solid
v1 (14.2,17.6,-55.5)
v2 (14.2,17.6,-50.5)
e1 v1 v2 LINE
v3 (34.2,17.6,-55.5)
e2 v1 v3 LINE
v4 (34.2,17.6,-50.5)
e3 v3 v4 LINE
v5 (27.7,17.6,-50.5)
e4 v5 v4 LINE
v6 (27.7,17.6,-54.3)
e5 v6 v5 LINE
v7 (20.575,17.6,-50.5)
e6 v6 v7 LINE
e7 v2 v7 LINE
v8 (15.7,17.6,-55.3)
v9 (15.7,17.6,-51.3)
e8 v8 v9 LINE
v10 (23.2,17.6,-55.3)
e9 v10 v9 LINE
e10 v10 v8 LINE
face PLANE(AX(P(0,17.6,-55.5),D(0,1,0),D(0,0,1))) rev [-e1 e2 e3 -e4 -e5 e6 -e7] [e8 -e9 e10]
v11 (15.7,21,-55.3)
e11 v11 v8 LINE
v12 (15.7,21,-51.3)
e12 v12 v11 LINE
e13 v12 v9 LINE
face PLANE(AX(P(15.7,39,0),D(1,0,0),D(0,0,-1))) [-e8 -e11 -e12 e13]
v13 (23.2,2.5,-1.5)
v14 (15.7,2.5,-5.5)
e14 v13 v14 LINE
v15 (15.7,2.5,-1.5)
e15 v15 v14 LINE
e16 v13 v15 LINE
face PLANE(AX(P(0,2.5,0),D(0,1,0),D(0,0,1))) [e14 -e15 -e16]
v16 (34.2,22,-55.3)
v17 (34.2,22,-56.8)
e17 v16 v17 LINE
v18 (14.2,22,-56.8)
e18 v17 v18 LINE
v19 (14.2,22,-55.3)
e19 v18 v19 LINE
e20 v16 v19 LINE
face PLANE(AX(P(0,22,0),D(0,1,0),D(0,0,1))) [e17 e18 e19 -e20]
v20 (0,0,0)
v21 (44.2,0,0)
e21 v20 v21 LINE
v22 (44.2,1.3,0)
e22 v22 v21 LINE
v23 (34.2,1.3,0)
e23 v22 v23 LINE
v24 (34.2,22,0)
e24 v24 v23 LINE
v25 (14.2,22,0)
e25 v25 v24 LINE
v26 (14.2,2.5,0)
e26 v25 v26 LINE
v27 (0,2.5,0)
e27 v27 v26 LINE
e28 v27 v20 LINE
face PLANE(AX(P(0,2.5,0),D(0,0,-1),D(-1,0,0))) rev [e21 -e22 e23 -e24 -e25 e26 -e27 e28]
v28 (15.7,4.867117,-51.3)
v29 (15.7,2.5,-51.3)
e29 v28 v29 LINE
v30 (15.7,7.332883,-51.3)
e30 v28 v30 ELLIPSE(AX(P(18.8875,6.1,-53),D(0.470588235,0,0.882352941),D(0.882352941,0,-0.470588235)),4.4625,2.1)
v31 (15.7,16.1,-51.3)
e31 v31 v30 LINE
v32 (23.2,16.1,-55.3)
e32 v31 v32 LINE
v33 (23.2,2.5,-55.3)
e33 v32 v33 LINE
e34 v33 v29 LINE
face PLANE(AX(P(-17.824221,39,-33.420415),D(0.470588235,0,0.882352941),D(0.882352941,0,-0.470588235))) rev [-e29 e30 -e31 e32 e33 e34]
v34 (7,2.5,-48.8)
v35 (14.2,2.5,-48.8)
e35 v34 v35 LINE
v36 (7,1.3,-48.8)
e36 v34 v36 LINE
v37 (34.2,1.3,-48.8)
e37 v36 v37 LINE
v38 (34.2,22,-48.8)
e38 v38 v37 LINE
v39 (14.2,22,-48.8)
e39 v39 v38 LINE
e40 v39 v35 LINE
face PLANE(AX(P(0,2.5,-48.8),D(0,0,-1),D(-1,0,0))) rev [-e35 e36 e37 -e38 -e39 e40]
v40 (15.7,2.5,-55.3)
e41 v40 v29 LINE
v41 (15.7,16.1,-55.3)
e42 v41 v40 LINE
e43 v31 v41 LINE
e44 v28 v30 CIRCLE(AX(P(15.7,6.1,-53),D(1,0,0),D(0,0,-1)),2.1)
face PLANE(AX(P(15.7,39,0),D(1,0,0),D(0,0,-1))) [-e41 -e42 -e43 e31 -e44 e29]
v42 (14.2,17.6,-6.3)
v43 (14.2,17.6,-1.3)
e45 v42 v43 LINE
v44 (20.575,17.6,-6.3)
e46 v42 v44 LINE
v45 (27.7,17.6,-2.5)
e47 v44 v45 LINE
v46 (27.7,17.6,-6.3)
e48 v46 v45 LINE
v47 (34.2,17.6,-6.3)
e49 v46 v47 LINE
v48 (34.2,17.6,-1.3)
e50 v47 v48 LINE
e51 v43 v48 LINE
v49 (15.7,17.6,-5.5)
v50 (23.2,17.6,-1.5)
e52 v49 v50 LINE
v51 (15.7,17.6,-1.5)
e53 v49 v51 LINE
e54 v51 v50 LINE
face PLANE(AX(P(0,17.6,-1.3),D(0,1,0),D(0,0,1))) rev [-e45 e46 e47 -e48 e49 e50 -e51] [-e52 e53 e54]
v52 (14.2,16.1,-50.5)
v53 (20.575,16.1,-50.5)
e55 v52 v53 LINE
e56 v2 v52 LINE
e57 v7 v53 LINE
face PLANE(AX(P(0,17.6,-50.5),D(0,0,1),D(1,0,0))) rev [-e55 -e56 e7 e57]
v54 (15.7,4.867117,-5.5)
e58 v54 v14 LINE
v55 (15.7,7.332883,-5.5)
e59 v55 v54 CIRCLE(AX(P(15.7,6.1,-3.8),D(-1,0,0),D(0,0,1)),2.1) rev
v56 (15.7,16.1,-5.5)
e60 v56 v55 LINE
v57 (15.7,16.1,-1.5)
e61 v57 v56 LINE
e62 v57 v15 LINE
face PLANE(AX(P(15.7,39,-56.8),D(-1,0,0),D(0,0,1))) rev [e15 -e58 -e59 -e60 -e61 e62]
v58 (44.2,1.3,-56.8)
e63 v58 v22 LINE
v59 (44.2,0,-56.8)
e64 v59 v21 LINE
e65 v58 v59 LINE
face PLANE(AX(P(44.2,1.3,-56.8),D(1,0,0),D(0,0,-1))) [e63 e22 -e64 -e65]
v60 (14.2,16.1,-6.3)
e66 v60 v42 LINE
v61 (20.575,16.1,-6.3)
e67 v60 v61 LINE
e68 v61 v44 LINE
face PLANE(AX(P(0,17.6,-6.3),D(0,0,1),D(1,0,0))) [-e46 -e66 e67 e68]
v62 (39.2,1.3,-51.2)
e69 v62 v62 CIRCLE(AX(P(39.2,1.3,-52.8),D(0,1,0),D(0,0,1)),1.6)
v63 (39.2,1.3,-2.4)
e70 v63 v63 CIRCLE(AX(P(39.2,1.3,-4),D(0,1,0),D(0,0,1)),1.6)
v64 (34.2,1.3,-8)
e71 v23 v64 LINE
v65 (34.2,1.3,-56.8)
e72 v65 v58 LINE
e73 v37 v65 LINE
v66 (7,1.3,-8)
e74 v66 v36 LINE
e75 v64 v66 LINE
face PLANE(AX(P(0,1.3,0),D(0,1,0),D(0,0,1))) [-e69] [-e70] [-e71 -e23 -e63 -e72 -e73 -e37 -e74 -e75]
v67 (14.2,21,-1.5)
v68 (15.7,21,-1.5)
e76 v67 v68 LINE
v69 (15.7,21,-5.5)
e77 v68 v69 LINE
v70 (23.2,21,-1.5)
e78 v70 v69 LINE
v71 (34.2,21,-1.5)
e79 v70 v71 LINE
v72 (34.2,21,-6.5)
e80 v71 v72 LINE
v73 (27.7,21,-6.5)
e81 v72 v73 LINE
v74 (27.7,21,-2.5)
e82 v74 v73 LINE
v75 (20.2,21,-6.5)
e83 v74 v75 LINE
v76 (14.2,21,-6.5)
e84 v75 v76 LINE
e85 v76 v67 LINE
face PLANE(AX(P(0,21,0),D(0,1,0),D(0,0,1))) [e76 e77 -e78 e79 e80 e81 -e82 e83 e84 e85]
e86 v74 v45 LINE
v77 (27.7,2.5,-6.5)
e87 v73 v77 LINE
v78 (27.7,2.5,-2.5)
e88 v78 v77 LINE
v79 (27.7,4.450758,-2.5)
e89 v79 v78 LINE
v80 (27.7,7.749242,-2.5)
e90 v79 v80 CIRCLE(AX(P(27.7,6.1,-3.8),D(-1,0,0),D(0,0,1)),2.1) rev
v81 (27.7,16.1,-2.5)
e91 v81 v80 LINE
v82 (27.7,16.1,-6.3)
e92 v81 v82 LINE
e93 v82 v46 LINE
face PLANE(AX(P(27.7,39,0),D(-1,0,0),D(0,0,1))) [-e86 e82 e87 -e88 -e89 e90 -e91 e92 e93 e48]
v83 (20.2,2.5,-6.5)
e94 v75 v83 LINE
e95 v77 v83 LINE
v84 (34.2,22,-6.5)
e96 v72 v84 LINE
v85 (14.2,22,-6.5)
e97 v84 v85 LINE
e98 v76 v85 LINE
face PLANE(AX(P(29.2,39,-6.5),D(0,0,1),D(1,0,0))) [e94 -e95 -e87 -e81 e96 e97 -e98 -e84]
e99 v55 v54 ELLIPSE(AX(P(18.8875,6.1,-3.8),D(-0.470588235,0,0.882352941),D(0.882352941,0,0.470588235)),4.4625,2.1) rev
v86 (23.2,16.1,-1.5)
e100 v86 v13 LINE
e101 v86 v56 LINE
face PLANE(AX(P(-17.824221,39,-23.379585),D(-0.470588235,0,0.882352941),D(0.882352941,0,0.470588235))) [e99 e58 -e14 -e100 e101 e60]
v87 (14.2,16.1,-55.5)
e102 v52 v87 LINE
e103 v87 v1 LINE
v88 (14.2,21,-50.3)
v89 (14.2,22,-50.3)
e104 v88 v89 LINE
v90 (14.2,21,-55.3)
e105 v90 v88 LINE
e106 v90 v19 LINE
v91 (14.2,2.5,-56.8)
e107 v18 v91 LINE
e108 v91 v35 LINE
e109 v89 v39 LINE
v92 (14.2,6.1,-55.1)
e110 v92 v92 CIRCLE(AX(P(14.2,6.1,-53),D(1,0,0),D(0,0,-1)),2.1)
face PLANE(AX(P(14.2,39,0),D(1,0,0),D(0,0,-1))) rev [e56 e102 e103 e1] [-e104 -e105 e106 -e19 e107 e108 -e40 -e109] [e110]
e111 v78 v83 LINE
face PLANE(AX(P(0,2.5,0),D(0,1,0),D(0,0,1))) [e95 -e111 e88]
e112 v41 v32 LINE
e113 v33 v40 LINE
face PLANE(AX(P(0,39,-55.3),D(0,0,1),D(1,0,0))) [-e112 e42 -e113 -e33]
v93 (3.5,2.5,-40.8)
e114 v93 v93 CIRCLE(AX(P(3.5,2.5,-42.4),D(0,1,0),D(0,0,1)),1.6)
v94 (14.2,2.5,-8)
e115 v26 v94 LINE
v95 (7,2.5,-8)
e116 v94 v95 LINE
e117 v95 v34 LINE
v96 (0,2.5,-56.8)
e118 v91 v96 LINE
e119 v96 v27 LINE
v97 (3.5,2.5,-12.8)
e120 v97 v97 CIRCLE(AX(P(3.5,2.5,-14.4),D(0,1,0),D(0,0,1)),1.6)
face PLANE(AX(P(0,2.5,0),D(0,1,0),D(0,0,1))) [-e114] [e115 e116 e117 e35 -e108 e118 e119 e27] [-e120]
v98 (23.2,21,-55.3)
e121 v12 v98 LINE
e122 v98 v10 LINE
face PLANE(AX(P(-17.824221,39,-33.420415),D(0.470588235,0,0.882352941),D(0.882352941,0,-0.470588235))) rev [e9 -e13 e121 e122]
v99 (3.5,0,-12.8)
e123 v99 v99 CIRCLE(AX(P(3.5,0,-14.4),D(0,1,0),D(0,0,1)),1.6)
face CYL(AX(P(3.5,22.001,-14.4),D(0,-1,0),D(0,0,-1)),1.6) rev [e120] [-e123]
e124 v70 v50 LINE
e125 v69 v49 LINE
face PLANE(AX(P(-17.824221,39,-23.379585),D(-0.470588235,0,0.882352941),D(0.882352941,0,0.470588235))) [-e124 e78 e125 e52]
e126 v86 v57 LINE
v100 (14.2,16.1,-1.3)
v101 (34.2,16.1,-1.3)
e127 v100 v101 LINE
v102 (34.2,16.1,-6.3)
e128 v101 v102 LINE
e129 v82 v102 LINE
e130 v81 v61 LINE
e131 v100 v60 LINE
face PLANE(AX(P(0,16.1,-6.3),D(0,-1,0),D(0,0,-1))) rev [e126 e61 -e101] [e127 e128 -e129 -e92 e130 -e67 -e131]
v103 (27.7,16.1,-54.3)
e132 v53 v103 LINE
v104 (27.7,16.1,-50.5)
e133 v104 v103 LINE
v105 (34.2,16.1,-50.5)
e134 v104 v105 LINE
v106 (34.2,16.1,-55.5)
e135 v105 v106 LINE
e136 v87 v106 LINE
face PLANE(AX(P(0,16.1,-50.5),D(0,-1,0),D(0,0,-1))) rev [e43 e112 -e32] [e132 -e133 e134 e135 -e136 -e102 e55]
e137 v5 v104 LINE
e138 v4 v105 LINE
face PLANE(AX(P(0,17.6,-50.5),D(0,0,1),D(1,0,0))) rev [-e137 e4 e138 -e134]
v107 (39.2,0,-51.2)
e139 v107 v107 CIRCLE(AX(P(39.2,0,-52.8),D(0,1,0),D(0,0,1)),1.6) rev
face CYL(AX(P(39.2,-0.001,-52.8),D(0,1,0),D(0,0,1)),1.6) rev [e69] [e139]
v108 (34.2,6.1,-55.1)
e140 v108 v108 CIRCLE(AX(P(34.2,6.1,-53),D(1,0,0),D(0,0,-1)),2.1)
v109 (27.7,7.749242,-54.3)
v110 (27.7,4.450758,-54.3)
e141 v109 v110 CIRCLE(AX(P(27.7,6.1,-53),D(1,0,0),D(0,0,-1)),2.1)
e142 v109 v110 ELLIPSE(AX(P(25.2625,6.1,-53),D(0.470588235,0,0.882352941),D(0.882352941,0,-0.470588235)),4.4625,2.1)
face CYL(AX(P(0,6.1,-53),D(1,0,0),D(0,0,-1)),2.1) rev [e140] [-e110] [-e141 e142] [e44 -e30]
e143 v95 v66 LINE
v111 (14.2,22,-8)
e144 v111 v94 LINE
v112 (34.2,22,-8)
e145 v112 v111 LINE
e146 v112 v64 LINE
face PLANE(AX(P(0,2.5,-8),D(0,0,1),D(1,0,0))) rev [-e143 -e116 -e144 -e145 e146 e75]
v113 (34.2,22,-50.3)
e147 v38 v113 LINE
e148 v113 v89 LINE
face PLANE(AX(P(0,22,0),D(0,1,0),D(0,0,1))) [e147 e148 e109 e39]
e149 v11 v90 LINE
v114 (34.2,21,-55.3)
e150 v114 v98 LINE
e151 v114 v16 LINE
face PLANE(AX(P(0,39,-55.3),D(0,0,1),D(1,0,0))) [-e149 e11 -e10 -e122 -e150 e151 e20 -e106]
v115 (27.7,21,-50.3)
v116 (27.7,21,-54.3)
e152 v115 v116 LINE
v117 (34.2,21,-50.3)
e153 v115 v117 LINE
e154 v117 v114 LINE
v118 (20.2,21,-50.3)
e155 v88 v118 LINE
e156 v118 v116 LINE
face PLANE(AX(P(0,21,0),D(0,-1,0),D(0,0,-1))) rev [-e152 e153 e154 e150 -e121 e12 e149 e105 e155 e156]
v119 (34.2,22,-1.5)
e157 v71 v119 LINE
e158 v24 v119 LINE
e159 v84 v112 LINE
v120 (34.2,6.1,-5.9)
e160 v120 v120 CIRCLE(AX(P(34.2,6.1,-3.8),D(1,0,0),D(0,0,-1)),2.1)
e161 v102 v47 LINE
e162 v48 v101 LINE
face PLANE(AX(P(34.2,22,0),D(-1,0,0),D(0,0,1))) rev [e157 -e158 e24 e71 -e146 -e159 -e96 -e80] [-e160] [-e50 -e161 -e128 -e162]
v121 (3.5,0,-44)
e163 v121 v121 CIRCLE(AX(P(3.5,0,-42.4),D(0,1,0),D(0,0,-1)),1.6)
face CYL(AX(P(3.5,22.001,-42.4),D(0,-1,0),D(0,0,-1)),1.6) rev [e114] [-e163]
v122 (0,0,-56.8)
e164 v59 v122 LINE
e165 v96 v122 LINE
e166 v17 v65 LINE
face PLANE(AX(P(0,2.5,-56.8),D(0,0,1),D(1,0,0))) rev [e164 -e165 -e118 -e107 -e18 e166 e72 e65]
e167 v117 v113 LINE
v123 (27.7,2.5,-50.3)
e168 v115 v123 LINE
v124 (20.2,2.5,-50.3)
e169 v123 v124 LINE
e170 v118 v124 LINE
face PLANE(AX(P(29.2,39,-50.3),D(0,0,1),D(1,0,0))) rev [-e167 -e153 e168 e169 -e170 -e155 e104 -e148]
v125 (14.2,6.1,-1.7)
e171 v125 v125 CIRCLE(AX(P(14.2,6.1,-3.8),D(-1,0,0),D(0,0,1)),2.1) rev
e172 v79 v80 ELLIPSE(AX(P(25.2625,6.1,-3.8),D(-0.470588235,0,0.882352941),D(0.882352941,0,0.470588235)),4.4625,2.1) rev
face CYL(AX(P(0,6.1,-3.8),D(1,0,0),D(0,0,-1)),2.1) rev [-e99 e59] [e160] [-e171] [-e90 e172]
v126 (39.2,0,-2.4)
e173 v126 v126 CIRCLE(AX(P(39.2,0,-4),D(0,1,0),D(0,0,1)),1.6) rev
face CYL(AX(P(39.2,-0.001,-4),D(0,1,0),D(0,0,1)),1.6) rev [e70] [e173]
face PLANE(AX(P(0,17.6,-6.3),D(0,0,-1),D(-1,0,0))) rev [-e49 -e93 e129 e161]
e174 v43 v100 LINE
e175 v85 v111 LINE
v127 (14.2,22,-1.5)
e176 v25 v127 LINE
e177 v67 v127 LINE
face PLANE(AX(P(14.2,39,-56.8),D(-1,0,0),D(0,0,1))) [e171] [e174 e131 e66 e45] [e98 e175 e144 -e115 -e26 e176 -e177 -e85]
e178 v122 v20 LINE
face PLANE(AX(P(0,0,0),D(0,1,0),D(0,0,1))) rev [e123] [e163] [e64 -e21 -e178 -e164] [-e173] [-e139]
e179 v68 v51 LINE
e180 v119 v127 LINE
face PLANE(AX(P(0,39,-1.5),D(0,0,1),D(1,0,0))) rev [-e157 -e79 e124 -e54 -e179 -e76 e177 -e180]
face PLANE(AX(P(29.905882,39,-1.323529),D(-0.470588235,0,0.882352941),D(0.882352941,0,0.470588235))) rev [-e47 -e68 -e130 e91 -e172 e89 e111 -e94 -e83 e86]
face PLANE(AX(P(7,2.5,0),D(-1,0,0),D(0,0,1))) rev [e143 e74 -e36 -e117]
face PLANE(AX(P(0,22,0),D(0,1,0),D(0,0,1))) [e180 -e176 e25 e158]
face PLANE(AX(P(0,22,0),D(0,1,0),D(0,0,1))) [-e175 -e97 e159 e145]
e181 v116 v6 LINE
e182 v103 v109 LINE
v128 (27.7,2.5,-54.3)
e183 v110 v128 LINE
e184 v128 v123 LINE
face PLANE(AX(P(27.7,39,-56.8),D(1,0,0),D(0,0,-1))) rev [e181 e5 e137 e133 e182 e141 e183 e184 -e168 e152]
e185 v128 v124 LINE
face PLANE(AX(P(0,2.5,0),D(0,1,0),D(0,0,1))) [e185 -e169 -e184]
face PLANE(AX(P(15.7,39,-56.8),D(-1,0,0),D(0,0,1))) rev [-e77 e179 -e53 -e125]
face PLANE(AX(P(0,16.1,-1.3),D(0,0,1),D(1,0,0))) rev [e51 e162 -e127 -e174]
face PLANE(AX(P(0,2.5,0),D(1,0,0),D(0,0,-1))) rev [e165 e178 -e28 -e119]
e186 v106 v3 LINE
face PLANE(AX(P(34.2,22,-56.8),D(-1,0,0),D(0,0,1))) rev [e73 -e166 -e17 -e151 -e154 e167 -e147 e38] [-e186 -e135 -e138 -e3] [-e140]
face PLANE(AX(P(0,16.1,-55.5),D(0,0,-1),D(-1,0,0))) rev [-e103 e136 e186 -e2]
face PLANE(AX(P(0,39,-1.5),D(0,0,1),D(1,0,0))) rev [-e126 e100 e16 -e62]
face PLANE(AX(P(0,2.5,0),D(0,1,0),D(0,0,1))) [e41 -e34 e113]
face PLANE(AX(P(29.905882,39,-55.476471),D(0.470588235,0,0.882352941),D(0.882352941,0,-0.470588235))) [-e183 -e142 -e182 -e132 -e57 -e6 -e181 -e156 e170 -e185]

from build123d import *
from build123d.topology import SkipClean

# Parameters (mm, degrees)
BOSS_EXTRU_1_DEPTH      = 2.5
ESQUISSE2_W             = 5
ESQUISSE2_H             = 8
BOSS_EXTRU_2_DEPTH      = 22
ENL_V_MAT_EXTRU_2_REACH = 71.856
ESQUISSE4_R             = 1.6
EXTRU_MINCE1_OUTLINE_W  = 15
EXTRU_MINCE1_OUTLINE_H  = 8
EXTRU_MINCE1_DEPTH      = 19.5
BOSS_EXTRU_3_DEPTH      = 1.3
ESQUISSE3_R             = 2.1
ESQUISSE3_W             = 5
ESQUISSE3_H             = 1.5
ENL_V_MAT_EXTRU_1_DEPTH = 70.856137884
ENL_V_MAT_EXTRU_3_REACH = 76.889
ESQUISSE7_R             = 1.6
ESQUISSE8_W             = 20
ESQUISSE8_H             = 5
ENL_V_MAT_EXTRU_5_DEPTH = 1


# Read off the part's stored shape, not the designer's step: Extru.-Mince1
with BuildPart() as part:
    # Esquisse1 → Boss.-Extru.1 (new body)
    with BuildSketch(Plane(origin=(0, 0, 0), x_dir=(1, 0, 0), z_dir=(0, 1, 0))):
        Polygon((0, 0), (29.2, 0), (29.2, 8), (7, 8), (7, 48.8), (29.2, 48.8), (29.2, 56.8), (0, 56.8), align=None)
    extrude(amount=BOSS_EXTRU_1_DEPTH)

    # Esquisse2 → Boss.-Extru.2 (add)
    with BuildSketch(Plane(origin=(0, 0, 0), x_dir=(1, 0, 0), z_dir=(0, 1, 0))):
        with Locations((31.7, 52.8)):
            Rectangle(ESQUISSE2_W, ESQUISSE2_H)
        with Locations((31.7, 4)):
            Rectangle(ESQUISSE2_W, ESQUISSE2_H)
    extrude(amount=BOSS_EXTRU_2_DEPTH)

    # Esquisse4 → Enlèv. mat.-Extru.2 (cut, up to next)
    with BuildSketch(Plane(origin=(0, 0, 0), x_dir=(1, 0, 0), z_dir=(0, 1, 0)), mode=Mode.PRIVATE) as enl_v_mat_extru_2_sk1:
        with Locations(Location((3.5, 14.4, 0), (0, 0, 270))):
            Circle(ESQUISSE4_R)
    enl_v_mat_extru_2_tool1 = extrude(enl_v_mat_extru_2_sk1.sketch, amount=ENL_V_MAT_EXTRU_2_REACH, mode=Mode.PRIVATE) & part.part
    # Esquisse4 → Enlèv. mat.-Extru.2 (cut, up to next)
    with BuildSketch(Plane(origin=(0, 0, 0), x_dir=(1, 0, 0), z_dir=(0, 1, 0)), mode=Mode.PRIVATE) as enl_v_mat_extru_2_sk2:
        with Locations(Location((3.5, 42.4, 0), (0, 0, 90))):
            Circle(ESQUISSE4_R)
    enl_v_mat_extru_2_tool2 = extrude(enl_v_mat_extru_2_sk2.sketch, amount=ENL_V_MAT_EXTRU_2_REACH, mode=Mode.PRIVATE) & part.part
    add(enl_v_mat_extru_2_tool1.solids().sort_by_distance((3.5, 0, -14.4))[0], mode=Mode.SUBTRACT)
    add(enl_v_mat_extru_2_tool2.solids().sort_by_distance((3.5, 0, -42.4))[0], mode=Mode.SUBTRACT)

    # Extru.-Mince1 outline → Extru.-Mince1 (add)
    with BuildSketch(Plane(origin=(0, 2.5, 0), x_dir=(1, 0, 0), z_dir=(0, 1, 0))):
        with Locations((21.7, 52.8)):
            Rectangle(EXTRU_MINCE1_OUTLINE_W, EXTRU_MINCE1_OUTLINE_H)
        Polygon((27.7, 50.3), (20.2, 50.3), (27.7, 54.3), align=None, mode=Mode.SUBTRACT)
        Polygon((15.7, 51.3), (15.7, 55.3), (23.2, 55.3), align=None, mode=Mode.SUBTRACT)
    extru_mince1 = extrude(amount=EXTRU_MINCE1_DEPTH)

    # Esquisse6 → Boss.-Extru.3 (add)
    with BuildSketch(Plane.XZ):
        Polygon((34.2, -8), (7, -8), (7, -48.8), (34.2, -48.8), (34.2, -56.8), (44.2, -56.8), (44.2, 0), (34.2, 0), align=None)
    extrude(amount=-BOSS_EXTRU_3_DEPTH)

    # Esquisse3 → Enlèv. mat.-Extru.1 (cut, through all)
    with BuildSketch(Plane(origin=(34.2, 0, 0), x_dir=(0, 0, -1), z_dir=(1, 0, 0))):
        with Locations((3.8, 6.1)):
            Circle(ESQUISSE3_R)
        with Locations((53, 6.1)):
            Circle(ESQUISSE3_R)
        with Locations((3.8, 16.85)):
            Rectangle(ESQUISSE3_W, ESQUISSE3_H)
        with Locations((53, 16.85)):
            Rectangle(ESQUISSE3_W, ESQUISSE3_H)
    enl_v_mat_extru_1 = extrude(amount=-ENL_V_MAT_EXTRU_1_DEPTH, mode=Mode.SUBTRACT)

    # Symétrie1: Extru.-Mince1, Enlèv. mat.-Extru.1 across plane
    with SkipClean():  # the faces are left unmerged after this step: merging them gives an invalid solid
        add(extru_mince1.mirror(Plane(origin=(0, 0, -28.4), x_dir=(1, 0, 0), z_dir=(0, 0, -1))))
        add(enl_v_mat_extru_1.mirror(Plane(origin=(0, 0, -28.4), x_dir=(1, 0, 0), z_dir=(0, 0, -1))), mode=Mode.SUBTRACT)

    # Esquisse7 → Enlèv. mat.-Extru.3 (cut, up to next)
    with BuildSketch(Plane(origin=(0, 1.3, 0), x_dir=(1, 0, 0), z_dir=(0, 1, 0)), mode=Mode.PRIVATE) as enl_v_mat_extru_3_sk1:
        with Locations(Location((39.2, 52.8, 0), (0, 0, 270))):
            Circle(ESQUISSE7_R)
    enl_v_mat_extru_3_tool1 = extrude(enl_v_mat_extru_3_sk1.sketch, amount=-ENL_V_MAT_EXTRU_3_REACH, mode=Mode.PRIVATE) & part.part
    # Esquisse7 → Enlèv. mat.-Extru.3 (cut, up to next)
    with BuildSketch(Plane(origin=(0, 1.3, 0), x_dir=(1, 0, 0), z_dir=(0, 1, 0)), mode=Mode.PRIVATE) as enl_v_mat_extru_3_sk2:
        with Locations(Location((39.2, 4, 0), (0, 0, 270))):
            Circle(ESQUISSE7_R)
    enl_v_mat_extru_3_tool2 = extrude(enl_v_mat_extru_3_sk2.sketch, amount=-ENL_V_MAT_EXTRU_3_REACH, mode=Mode.PRIVATE) & part.part
    add(enl_v_mat_extru_3_tool1.solids().sort_by_distance((39.2, 1.3, -52.8))[0], mode=Mode.SUBTRACT)
    add(enl_v_mat_extru_3_tool2.solids().sort_by_distance((39.2, 1.3, -4))[0], mode=Mode.SUBTRACT)

    # Esquisse8 → Enlèv. mat.-Extru.5 (cut)
    with SkipClean():  # the faces are left unmerged after this step: merging them gives an invalid solid
        with BuildSketch(Plane(origin=(0, 22, 0), x_dir=(1, 0, 0), z_dir=(0, 1, 0))):
            with Locations((24.2, 52.8)):
                Rectangle(ESQUISSE8_W, ESQUISSE8_H)
            with Locations((24.2, 4)):
                Rectangle(ESQUISSE8_W, ESQUISSE8_H)
        extrude(amount=-ENL_V_MAT_EXTRU_5_DEPTH, mode=Mode.SUBTRACT)


solid = part.part
